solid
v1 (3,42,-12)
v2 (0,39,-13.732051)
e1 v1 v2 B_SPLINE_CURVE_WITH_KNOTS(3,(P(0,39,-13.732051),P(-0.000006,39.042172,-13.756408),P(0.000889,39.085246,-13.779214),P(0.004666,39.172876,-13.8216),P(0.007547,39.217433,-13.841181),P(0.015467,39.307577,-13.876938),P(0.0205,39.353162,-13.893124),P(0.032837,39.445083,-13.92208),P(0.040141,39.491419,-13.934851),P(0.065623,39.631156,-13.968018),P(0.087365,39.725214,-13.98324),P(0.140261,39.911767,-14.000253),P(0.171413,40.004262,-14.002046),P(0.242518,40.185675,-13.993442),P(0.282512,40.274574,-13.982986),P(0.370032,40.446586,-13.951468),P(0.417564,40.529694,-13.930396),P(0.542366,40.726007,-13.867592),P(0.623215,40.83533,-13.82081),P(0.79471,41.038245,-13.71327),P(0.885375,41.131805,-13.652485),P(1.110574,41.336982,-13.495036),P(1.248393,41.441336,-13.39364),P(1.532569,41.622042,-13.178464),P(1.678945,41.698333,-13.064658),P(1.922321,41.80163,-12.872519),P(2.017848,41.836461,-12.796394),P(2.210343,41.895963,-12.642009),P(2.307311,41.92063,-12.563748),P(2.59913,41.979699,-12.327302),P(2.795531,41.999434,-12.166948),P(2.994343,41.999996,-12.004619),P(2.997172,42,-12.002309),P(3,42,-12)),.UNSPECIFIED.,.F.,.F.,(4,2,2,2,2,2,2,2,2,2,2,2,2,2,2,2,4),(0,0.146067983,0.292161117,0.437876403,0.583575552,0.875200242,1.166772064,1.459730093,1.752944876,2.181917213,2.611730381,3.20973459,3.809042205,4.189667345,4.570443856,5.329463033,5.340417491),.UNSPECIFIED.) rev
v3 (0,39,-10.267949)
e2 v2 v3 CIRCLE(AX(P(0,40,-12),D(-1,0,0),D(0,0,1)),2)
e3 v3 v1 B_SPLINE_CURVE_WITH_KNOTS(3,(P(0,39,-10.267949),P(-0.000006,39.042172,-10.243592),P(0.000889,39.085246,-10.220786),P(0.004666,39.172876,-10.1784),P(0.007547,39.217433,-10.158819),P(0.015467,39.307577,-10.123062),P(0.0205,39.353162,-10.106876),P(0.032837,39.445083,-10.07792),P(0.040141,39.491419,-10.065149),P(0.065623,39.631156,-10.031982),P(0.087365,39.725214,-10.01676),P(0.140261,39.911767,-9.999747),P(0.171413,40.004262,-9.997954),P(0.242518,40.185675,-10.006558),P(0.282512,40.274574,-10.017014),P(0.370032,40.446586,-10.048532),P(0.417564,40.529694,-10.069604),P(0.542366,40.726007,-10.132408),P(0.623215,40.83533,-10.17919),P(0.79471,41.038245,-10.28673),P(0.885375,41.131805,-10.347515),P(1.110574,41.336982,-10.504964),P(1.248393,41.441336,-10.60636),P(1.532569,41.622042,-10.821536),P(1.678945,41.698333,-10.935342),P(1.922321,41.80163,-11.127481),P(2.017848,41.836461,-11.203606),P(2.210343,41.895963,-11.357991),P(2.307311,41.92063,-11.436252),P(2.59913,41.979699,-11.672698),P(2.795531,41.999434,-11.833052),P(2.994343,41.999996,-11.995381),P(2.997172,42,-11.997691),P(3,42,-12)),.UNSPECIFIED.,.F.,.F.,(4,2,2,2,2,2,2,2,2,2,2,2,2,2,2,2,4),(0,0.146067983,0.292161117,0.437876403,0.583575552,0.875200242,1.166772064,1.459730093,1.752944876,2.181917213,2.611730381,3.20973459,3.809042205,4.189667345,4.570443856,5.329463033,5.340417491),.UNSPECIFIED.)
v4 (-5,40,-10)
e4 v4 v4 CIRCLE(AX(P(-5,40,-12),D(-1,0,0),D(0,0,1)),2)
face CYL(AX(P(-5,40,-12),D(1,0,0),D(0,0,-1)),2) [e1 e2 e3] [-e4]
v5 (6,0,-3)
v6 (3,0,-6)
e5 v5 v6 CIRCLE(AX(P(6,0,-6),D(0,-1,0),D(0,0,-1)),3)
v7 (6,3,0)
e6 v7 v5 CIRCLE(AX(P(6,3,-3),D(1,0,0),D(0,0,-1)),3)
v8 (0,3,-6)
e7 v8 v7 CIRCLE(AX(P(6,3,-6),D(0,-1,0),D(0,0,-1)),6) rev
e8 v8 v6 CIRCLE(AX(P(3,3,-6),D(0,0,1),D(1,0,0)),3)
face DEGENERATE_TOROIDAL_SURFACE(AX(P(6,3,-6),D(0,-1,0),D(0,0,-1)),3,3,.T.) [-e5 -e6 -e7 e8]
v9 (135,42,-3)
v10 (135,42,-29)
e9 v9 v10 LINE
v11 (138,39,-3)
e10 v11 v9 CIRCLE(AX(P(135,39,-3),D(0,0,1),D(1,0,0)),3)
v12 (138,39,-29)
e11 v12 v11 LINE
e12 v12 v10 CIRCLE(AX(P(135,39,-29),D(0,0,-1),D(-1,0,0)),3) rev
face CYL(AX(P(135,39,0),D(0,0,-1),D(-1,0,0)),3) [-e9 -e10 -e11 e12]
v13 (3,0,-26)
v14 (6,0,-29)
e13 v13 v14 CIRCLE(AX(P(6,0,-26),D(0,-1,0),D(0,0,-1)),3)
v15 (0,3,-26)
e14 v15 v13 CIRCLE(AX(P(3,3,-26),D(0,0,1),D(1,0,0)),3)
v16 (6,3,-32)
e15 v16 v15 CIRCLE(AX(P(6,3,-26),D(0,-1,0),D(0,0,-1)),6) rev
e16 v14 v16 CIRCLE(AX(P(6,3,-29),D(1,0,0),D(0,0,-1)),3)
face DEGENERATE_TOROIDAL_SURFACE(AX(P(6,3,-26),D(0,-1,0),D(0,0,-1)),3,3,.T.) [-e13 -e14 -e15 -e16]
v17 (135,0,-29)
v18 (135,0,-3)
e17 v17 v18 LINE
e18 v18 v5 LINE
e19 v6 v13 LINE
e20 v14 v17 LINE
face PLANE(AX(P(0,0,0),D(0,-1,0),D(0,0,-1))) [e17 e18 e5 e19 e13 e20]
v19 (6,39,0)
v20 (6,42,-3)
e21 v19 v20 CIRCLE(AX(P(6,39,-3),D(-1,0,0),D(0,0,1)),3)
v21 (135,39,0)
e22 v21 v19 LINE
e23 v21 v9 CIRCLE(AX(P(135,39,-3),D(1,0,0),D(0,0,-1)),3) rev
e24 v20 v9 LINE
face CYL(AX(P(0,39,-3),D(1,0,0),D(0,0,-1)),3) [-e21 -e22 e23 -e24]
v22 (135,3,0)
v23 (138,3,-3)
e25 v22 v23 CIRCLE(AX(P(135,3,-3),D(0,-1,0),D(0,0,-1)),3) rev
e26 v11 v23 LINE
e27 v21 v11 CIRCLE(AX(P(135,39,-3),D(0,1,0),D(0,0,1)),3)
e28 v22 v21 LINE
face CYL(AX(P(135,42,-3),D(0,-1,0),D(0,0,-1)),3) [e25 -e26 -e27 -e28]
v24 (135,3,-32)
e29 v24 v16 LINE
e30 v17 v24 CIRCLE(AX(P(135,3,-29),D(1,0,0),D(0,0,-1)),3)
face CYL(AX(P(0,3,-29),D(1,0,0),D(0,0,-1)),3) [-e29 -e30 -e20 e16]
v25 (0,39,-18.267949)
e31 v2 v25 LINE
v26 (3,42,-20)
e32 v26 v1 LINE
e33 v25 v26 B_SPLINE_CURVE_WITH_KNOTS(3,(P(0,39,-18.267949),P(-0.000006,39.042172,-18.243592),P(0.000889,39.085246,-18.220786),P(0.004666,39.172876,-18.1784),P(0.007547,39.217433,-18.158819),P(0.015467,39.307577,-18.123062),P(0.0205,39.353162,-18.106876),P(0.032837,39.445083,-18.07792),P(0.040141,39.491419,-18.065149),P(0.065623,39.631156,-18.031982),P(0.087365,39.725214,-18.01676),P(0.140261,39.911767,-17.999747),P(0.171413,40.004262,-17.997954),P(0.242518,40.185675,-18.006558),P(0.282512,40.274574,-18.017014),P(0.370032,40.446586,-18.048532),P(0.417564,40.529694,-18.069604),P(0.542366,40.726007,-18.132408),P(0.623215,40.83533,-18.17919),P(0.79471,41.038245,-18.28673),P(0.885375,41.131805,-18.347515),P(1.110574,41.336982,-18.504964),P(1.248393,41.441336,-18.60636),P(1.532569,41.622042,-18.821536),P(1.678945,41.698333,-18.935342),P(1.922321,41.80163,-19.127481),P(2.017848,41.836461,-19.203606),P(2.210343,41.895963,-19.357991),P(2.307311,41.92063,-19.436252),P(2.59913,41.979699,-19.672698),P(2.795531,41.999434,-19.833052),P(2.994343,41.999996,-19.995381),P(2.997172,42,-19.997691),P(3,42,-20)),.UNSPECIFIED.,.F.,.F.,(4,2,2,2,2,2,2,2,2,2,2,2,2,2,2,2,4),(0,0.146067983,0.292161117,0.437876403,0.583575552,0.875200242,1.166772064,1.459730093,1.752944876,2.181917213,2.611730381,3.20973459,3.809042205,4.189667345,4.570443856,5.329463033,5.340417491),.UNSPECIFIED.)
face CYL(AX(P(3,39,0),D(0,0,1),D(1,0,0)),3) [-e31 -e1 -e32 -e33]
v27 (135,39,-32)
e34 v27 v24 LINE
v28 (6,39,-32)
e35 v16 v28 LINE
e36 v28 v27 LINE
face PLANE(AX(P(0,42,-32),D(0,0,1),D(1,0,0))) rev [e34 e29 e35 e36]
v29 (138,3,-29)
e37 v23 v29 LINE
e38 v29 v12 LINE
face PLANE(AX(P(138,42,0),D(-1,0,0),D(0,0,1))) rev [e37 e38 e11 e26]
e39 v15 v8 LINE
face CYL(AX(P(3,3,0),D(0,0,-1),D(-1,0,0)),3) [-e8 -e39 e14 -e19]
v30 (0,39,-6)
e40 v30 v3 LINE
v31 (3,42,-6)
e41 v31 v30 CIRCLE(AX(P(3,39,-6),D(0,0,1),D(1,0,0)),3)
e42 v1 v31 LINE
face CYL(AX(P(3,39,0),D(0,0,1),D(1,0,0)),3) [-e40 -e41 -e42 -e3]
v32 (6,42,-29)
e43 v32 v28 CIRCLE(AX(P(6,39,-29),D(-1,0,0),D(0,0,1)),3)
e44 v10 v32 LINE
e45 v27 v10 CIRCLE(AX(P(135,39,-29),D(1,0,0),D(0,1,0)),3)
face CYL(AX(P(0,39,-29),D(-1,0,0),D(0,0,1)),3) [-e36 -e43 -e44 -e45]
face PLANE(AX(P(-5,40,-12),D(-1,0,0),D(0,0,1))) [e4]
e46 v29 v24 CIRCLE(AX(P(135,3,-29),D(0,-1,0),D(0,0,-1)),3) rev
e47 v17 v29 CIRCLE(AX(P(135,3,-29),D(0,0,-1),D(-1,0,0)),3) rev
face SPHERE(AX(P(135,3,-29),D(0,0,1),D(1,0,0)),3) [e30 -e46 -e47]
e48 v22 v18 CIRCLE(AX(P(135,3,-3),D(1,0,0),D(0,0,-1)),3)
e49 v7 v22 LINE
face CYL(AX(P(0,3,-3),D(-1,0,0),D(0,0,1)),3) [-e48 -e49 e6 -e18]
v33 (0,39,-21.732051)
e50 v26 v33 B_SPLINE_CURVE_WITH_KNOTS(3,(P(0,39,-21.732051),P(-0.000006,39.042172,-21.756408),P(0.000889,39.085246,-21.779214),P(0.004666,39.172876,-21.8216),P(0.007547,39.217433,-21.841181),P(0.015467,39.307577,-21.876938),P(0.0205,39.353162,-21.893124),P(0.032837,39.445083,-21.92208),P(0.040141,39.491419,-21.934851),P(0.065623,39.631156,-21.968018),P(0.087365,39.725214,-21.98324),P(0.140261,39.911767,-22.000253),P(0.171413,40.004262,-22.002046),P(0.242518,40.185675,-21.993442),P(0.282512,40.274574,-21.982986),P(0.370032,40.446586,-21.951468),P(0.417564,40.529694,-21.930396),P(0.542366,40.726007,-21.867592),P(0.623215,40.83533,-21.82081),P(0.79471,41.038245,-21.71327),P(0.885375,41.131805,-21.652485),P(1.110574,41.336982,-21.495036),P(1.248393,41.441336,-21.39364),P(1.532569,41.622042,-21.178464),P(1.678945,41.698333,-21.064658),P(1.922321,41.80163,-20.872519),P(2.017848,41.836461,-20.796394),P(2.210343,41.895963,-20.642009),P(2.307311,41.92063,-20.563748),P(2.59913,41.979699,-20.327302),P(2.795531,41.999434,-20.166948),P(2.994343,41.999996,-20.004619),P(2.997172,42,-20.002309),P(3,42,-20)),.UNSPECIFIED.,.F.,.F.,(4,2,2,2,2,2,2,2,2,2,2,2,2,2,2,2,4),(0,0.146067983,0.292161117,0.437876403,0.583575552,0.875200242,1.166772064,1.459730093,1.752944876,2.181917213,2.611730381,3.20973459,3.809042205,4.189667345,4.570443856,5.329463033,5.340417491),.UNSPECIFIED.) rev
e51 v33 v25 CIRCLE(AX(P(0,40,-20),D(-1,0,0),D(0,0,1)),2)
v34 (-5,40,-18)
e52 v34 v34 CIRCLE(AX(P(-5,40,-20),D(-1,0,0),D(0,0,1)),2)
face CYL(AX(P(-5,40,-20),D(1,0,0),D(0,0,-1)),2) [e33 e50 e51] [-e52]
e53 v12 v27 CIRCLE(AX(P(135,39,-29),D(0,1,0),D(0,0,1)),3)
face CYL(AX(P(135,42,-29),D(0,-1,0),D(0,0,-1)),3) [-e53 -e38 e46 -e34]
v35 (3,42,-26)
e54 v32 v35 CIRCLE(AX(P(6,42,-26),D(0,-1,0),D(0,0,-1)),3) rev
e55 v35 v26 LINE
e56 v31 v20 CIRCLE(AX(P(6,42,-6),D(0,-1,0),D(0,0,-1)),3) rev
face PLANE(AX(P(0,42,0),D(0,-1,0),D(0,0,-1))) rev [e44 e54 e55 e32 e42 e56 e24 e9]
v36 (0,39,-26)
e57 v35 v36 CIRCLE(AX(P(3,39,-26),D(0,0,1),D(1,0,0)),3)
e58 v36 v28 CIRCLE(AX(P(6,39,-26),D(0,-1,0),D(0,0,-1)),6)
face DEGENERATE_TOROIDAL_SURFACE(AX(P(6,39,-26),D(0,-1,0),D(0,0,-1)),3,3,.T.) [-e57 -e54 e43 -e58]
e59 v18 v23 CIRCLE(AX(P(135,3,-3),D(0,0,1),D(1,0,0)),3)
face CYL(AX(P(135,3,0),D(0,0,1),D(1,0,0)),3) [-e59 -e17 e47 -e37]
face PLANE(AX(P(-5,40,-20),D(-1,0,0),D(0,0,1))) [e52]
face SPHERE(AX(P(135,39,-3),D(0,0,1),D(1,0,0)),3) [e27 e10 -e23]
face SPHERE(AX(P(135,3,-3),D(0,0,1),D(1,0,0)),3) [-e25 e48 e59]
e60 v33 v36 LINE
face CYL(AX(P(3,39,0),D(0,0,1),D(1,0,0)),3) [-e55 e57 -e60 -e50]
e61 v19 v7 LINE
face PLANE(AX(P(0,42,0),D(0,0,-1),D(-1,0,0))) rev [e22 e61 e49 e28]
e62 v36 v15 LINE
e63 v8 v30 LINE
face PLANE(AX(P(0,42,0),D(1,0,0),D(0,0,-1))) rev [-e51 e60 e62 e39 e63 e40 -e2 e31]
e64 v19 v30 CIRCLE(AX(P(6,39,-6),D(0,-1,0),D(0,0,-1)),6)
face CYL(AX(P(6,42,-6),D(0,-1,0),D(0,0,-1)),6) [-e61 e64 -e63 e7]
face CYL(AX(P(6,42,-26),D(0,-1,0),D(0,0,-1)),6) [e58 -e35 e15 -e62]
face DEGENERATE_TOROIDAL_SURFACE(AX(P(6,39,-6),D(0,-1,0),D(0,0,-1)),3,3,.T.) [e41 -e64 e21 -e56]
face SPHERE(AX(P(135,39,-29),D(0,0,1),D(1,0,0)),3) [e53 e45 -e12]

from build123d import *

# Parameters (mm, degrees)
SKETCH1_W           = 138
SKETCH1_H           = 32
BOSS_EXTRUDE1_DEPTH = 42
SKETCH2_R           = 2
BOSS_EXTRUDE2_DEPTH = 5
FILLET1_R           = 6
FILLET2_R           = 3


with BuildPart() as part:
    # Sketch1 → Boss-Extrude1 (new body)
    with BuildSketch(Plane(origin=(0, 0, 0), x_dir=(1, 0, 0), z_dir=(0, 1, 0))):
        with Locations((69, 16)):
            Rectangle(SKETCH1_W, SKETCH1_H)
    extrude(amount=BOSS_EXTRUDE1_DEPTH)

    # Sketch2 → Boss-Extrude2 (add)
    with BuildSketch(Plane.ZY):
        with Locations(Location((-12, 40, 0), (0, 0, 90))):
            Circle(SKETCH2_R)
        with Locations(Location((-20, 40, 0), (0, 0, 90))):
            Circle(SKETCH2_R)
    extrude(amount=BOSS_EXTRUDE2_DEPTH)

    # Fillet1
    fillet1_edges = [part.edges().sort_by_distance(p)[0] for p in [
        (0, 21, -32),
        (0, 21, 0),
    ]]
    fillet(fillet1_edges, radius=FILLET1_R)

    # Fillet2
    # the kernel refuses this fillet: 3 mm, written as the material it takes off along each edge
    with BuildSketch(Plane(origin=(135, 39, -3), x_dir=(1, 0, 0), z_dir=(0, 0, 1))) as fillet2_piece_1_section:
        Polygon((0, 0), (FILLET2_R * 1.02, 0), (FILLET2_R * 1.02, FILLET2_R * 1.02), (0, FILLET2_R * 1.02), align=None)
    fillet2_piece_1 = extrude(amount=FILLET2_R * 1.02, mode=Mode.PRIVATE)
    fillet2_piece_1 = fillet2_piece_1 - Plane(origin=(135, 39, -3), x_dir=(-0.7071067811865475, -0.7071067811865475, 0), z_dir=(0, 0, 1)) * Sphere(FILLET2_R, mode=Mode.PRIVATE)
    add(fillet2_piece_1, mode=Mode.SUBTRACT)
    with BuildSketch(Plane(origin=(135, 39, -29), x_dir=(0, 1, 0), z_dir=(1, 0, 0))) as fillet2_piece_2_section:
        Polygon((0, 0), (FILLET2_R * 1.02, 0), (FILLET2_R * 1.02, -FILLET2_R * 1.02), (0, -FILLET2_R * 1.02), align=None)
    fillet2_piece_2 = extrude(amount=FILLET2_R * 1.02, mode=Mode.PRIVATE)
    fillet2_piece_2 = fillet2_piece_2 - Plane(origin=(135, 39, -29), x_dir=(0, -0.7071067811865475, 0.7071067811865475), z_dir=(1, 0, 0)) * Sphere(FILLET2_R, mode=Mode.PRIVATE)
    add(fillet2_piece_2, mode=Mode.SUBTRACT)
    with BuildSketch(Plane(origin=(135, 3, -3), x_dir=(0, -1, 0), z_dir=(0, 0, 1))) as fillet2_piece_3_section:
        Polygon((0, 0), (FILLET2_R * 1.02, 0), (FILLET2_R * 1.02, FILLET2_R * 1.02), (0, FILLET2_R * 1.02), align=None)
    fillet2_piece_3 = extrude(amount=FILLET2_R * 1.02, mode=Mode.PRIVATE)
    fillet2_piece_3 = fillet2_piece_3 - Plane(origin=(135, 3, -3), x_dir=(-0.7071067811865475, 0.7071067811865475, 0), z_dir=(0, 0, 1)) * Sphere(FILLET2_R, mode=Mode.PRIVATE)
    add(fillet2_piece_3, mode=Mode.SUBTRACT)
    with BuildSketch(Plane(origin=(135, 3, -29), x_dir=(1, 0, 0), z_dir=(0, -1, 0))) as fillet2_piece_4_section:
        Polygon((0, 0), (FILLET2_R * 1.02, 0), (FILLET2_R * 1.02, -FILLET2_R * 1.02), (0, -FILLET2_R * 1.02), align=None)
    fillet2_piece_4 = extrude(amount=FILLET2_R * 1.02, mode=Mode.PRIVATE)
    fillet2_piece_4 = fillet2_piece_4 - Plane(origin=(135, 3, -29), x_dir=(-0.7071067811865475, 0, 0.7071067811865475), z_dir=(0, -1, 0)) * Sphere(FILLET2_R, mode=Mode.PRIVATE)
    add(fillet2_piece_4, mode=Mode.SUBTRACT)
    with BuildSketch(Plane(origin=(138, 42, -3), x_dir=(0, -1, 0), z_dir=(0, 0, -1)), Plane(origin=(138, 0, -3), x_dir=(-1, 0, 0), z_dir=(0, 0, -1))) as fillet2_piece_5:
        with BuildLine():
            CenterArc((FILLET2_R, FILLET2_R), FILLET2_R, 180, 90)
            Line((0, FILLET2_R), (0, 0))
            Line((0, 0), (FILLET2_R, 0))
        make_face()
    extrude(amount=26, mode=Mode.SUBTRACT)
    with BuildSketch(Plane(origin=(0, 42, -12), x_dir=(1, 0, 0), z_dir=(0, 0, 1))) as fillet2_piece_6_section:
        with BuildLine():
            CenterArc((FILLET2_R, -FILLET2_R), FILLET2_R, 90, 90)
            Line((0, -FILLET2_R), (0, 0))
            Line((0, 0), (FILLET2_R, 0))
        make_face()
    fillet2_piece_6 = extrude(amount=6, mode=Mode.PRIVATE)
    fillet2_piece_6 = fillet2_piece_6 - Plane(origin=(0.483529934, 40, -12), x_dir=(0, 1, 0), z_dir=(1, 0, 0)) * Cylinder(2, 24, mode=Mode.PRIVATE)
    add(fillet2_piece_6, mode=Mode.SUBTRACT)
    with BuildSketch(Plane(origin=(135, 42, -32), x_dir=(0, 0, 1), z_dir=(-1, 0, 0)), Plane(origin=(6, 0, 0), x_dir=(0, 1, 0), z_dir=(1, 0, 0))) as fillet2_piece_7:
        with BuildLine():
            CenterArc((FILLET2_R, -FILLET2_R), FILLET2_R, 90, 90)
            Line((0, -FILLET2_R), (0, 0))
            Line((0, 0), (FILLET2_R, 0))
        make_face()
    extrude(amount=129, mode=Mode.SUBTRACT)
    with BuildSketch(Plane(origin=(0, 42, -20), x_dir=(1, 0, 0), z_dir=(0, 0, 1))) as fillet2_piece_8_section:
        with BuildLine():
            CenterArc((FILLET2_R, -FILLET2_R), FILLET2_R, 90, 90)
            Line((0, -FILLET2_R), (0, 0))
            Line((0, 0), (FILLET2_R, 0))
        make_face()
    fillet2_piece_8 = extrude(amount=8, mode=Mode.PRIVATE)
    fillet2_piece_8 = fillet2_piece_8 - Plane(origin=(0.736023116, 40, -20), x_dir=(0, 1, 0), z_dir=(1, 0, 0)) * Cylinder(2, 28, mode=Mode.PRIVATE)
    fillet2_piece_8 = fillet2_piece_8 - Plane(origin=(0.736023116, 40, -12), x_dir=(0, 1, 0), z_dir=(1, 0, 0)) * Cylinder(2, 28, mode=Mode.PRIVATE)
    add(fillet2_piece_8, mode=Mode.SUBTRACT)
    with BuildSketch(Plane(origin=(0, 42, -26), x_dir=(1, 0, 0), z_dir=(0, 0, 1))) as fillet2_piece_9_section:
        with BuildLine():
            CenterArc((FILLET2_R, -FILLET2_R), FILLET2_R, 90, 90)
            Line((0, -FILLET2_R), (0, 0))
            Line((0, 0), (FILLET2_R, 0))
        make_face()
    fillet2_piece_9 = extrude(amount=6, mode=Mode.PRIVATE)
    fillet2_piece_9 = fillet2_piece_9 - Plane(origin=(0.914317851, 40, -20), x_dir=(0, 1, 0), z_dir=(1, 0, 0)) * Cylinder(2, 24, mode=Mode.PRIVATE)
    add(fillet2_piece_9, mode=Mode.SUBTRACT)
    with BuildSketch(Plane(origin=(0, 0, -26), x_dir=(1, 0, 0), z_dir=(0, 0, 1))) as fillet2_piece_10:
        with BuildLine():
            CenterArc((FILLET2_R, FILLET2_R), FILLET2_R, 180, 90)
            Line((0, FILLET2_R), (0, 0))
            Line((0, 0), (FILLET2_R, 0))
        make_face()
    extrude(amount=20, mode=Mode.SUBTRACT)
    with BuildSketch(Plane(origin=(6, 0, -6), x_dir=(0, 0, 1), z_dir=(1, 0, 0))) as fillet2_piece_11:
        with BuildLine():
            CenterArc((6 - FILLET2_R, -FILLET2_R), FILLET2_R, 0, 90)
            Line((6, -FILLET2_R), (6, 0))
            Line((6, 0), (6 - FILLET2_R, 0))
        make_face()
    revolve(axis=Axis((6, 0, -6), (0, -1, 0)), revolution_arc=90, mode=Mode.SUBTRACT)
    with BuildSketch(Plane(origin=(6, 0, -26), x_dir=(-1, 0, 0), z_dir=(0, 0, 1))) as fillet2_piece_12:
        with BuildLine():
            CenterArc((6 - FILLET2_R, -FILLET2_R), FILLET2_R, 0, 90)
            Line((6, -FILLET2_R), (6, 0))
            Line((6, 0), (6 - FILLET2_R, 0))
        make_face()
    revolve(axis=Axis((6, 0, -26), (0, -1, 0)), revolution_arc=90, mode=Mode.SUBTRACT)
    with BuildSketch(Plane(origin=(6, 42, 0), x_dir=(0, -1, 0), z_dir=(1, 0, 0)), Plane(origin=(135, 0, -32), x_dir=(0, 0, 1), z_dir=(-1, 0, 0))) as fillet2_piece_13:
        with BuildLine():
            CenterArc((FILLET2_R, FILLET2_R), FILLET2_R, 180, 90)
            Line((0, FILLET2_R), (0, 0))
            Line((0, 0), (FILLET2_R, 0))
        make_face()
    extrude(amount=129, mode=Mode.SUBTRACT)
    with BuildSketch(Plane(origin=(6, 42, -6), x_dir=(0, 0, 1), z_dir=(1, 0, 0))) as fillet2_piece_14:
        with BuildLine():
            CenterArc((6 - FILLET2_R, FILLET2_R), FILLET2_R, 270, 90)
            Line((6 - FILLET2_R, 0), (6, 0))
            Line((6, 0), (6, FILLET2_R))
        make_face()
    revolve(axis=Axis((6, 42, -6), (0, -1, 0)), revolution_arc=90, mode=Mode.SUBTRACT)
    with BuildSketch(Plane(origin=(6, 42, -26), x_dir=(-1, 0, 0), z_dir=(0, 0, 1))) as fillet2_piece_15:
        with BuildLine():
            CenterArc((6 - FILLET2_R, FILLET2_R), FILLET2_R, 270, 90)
            Line((6, FILLET2_R), (6, 0))
            Line((6, 0), (6 - FILLET2_R, 0))
        make_face()
    revolve(axis=Axis((6, 42, -26), (0, -1, 0)), revolution_arc=90, mode=Mode.SUBTRACT)
    with BuildSketch(Plane(origin=(138, 3, -32), x_dir=(0, 0, 1), z_dir=(0, 1, 0)), Plane(origin=(138, 3, 0), x_dir=(-1, 0, 0), z_dir=(0, 1, 0))) as fillet2_piece_16:
        with BuildLine():
            CenterArc((FILLET2_R, -FILLET2_R), FILLET2_R, 90, 90)
            Line((0, -FILLET2_R), (0, 0))
            Line((0, 0), (FILLET2_R, 0))
        make_face()
    extrude(amount=36, mode=Mode.SUBTRACT)


solid = part.part
